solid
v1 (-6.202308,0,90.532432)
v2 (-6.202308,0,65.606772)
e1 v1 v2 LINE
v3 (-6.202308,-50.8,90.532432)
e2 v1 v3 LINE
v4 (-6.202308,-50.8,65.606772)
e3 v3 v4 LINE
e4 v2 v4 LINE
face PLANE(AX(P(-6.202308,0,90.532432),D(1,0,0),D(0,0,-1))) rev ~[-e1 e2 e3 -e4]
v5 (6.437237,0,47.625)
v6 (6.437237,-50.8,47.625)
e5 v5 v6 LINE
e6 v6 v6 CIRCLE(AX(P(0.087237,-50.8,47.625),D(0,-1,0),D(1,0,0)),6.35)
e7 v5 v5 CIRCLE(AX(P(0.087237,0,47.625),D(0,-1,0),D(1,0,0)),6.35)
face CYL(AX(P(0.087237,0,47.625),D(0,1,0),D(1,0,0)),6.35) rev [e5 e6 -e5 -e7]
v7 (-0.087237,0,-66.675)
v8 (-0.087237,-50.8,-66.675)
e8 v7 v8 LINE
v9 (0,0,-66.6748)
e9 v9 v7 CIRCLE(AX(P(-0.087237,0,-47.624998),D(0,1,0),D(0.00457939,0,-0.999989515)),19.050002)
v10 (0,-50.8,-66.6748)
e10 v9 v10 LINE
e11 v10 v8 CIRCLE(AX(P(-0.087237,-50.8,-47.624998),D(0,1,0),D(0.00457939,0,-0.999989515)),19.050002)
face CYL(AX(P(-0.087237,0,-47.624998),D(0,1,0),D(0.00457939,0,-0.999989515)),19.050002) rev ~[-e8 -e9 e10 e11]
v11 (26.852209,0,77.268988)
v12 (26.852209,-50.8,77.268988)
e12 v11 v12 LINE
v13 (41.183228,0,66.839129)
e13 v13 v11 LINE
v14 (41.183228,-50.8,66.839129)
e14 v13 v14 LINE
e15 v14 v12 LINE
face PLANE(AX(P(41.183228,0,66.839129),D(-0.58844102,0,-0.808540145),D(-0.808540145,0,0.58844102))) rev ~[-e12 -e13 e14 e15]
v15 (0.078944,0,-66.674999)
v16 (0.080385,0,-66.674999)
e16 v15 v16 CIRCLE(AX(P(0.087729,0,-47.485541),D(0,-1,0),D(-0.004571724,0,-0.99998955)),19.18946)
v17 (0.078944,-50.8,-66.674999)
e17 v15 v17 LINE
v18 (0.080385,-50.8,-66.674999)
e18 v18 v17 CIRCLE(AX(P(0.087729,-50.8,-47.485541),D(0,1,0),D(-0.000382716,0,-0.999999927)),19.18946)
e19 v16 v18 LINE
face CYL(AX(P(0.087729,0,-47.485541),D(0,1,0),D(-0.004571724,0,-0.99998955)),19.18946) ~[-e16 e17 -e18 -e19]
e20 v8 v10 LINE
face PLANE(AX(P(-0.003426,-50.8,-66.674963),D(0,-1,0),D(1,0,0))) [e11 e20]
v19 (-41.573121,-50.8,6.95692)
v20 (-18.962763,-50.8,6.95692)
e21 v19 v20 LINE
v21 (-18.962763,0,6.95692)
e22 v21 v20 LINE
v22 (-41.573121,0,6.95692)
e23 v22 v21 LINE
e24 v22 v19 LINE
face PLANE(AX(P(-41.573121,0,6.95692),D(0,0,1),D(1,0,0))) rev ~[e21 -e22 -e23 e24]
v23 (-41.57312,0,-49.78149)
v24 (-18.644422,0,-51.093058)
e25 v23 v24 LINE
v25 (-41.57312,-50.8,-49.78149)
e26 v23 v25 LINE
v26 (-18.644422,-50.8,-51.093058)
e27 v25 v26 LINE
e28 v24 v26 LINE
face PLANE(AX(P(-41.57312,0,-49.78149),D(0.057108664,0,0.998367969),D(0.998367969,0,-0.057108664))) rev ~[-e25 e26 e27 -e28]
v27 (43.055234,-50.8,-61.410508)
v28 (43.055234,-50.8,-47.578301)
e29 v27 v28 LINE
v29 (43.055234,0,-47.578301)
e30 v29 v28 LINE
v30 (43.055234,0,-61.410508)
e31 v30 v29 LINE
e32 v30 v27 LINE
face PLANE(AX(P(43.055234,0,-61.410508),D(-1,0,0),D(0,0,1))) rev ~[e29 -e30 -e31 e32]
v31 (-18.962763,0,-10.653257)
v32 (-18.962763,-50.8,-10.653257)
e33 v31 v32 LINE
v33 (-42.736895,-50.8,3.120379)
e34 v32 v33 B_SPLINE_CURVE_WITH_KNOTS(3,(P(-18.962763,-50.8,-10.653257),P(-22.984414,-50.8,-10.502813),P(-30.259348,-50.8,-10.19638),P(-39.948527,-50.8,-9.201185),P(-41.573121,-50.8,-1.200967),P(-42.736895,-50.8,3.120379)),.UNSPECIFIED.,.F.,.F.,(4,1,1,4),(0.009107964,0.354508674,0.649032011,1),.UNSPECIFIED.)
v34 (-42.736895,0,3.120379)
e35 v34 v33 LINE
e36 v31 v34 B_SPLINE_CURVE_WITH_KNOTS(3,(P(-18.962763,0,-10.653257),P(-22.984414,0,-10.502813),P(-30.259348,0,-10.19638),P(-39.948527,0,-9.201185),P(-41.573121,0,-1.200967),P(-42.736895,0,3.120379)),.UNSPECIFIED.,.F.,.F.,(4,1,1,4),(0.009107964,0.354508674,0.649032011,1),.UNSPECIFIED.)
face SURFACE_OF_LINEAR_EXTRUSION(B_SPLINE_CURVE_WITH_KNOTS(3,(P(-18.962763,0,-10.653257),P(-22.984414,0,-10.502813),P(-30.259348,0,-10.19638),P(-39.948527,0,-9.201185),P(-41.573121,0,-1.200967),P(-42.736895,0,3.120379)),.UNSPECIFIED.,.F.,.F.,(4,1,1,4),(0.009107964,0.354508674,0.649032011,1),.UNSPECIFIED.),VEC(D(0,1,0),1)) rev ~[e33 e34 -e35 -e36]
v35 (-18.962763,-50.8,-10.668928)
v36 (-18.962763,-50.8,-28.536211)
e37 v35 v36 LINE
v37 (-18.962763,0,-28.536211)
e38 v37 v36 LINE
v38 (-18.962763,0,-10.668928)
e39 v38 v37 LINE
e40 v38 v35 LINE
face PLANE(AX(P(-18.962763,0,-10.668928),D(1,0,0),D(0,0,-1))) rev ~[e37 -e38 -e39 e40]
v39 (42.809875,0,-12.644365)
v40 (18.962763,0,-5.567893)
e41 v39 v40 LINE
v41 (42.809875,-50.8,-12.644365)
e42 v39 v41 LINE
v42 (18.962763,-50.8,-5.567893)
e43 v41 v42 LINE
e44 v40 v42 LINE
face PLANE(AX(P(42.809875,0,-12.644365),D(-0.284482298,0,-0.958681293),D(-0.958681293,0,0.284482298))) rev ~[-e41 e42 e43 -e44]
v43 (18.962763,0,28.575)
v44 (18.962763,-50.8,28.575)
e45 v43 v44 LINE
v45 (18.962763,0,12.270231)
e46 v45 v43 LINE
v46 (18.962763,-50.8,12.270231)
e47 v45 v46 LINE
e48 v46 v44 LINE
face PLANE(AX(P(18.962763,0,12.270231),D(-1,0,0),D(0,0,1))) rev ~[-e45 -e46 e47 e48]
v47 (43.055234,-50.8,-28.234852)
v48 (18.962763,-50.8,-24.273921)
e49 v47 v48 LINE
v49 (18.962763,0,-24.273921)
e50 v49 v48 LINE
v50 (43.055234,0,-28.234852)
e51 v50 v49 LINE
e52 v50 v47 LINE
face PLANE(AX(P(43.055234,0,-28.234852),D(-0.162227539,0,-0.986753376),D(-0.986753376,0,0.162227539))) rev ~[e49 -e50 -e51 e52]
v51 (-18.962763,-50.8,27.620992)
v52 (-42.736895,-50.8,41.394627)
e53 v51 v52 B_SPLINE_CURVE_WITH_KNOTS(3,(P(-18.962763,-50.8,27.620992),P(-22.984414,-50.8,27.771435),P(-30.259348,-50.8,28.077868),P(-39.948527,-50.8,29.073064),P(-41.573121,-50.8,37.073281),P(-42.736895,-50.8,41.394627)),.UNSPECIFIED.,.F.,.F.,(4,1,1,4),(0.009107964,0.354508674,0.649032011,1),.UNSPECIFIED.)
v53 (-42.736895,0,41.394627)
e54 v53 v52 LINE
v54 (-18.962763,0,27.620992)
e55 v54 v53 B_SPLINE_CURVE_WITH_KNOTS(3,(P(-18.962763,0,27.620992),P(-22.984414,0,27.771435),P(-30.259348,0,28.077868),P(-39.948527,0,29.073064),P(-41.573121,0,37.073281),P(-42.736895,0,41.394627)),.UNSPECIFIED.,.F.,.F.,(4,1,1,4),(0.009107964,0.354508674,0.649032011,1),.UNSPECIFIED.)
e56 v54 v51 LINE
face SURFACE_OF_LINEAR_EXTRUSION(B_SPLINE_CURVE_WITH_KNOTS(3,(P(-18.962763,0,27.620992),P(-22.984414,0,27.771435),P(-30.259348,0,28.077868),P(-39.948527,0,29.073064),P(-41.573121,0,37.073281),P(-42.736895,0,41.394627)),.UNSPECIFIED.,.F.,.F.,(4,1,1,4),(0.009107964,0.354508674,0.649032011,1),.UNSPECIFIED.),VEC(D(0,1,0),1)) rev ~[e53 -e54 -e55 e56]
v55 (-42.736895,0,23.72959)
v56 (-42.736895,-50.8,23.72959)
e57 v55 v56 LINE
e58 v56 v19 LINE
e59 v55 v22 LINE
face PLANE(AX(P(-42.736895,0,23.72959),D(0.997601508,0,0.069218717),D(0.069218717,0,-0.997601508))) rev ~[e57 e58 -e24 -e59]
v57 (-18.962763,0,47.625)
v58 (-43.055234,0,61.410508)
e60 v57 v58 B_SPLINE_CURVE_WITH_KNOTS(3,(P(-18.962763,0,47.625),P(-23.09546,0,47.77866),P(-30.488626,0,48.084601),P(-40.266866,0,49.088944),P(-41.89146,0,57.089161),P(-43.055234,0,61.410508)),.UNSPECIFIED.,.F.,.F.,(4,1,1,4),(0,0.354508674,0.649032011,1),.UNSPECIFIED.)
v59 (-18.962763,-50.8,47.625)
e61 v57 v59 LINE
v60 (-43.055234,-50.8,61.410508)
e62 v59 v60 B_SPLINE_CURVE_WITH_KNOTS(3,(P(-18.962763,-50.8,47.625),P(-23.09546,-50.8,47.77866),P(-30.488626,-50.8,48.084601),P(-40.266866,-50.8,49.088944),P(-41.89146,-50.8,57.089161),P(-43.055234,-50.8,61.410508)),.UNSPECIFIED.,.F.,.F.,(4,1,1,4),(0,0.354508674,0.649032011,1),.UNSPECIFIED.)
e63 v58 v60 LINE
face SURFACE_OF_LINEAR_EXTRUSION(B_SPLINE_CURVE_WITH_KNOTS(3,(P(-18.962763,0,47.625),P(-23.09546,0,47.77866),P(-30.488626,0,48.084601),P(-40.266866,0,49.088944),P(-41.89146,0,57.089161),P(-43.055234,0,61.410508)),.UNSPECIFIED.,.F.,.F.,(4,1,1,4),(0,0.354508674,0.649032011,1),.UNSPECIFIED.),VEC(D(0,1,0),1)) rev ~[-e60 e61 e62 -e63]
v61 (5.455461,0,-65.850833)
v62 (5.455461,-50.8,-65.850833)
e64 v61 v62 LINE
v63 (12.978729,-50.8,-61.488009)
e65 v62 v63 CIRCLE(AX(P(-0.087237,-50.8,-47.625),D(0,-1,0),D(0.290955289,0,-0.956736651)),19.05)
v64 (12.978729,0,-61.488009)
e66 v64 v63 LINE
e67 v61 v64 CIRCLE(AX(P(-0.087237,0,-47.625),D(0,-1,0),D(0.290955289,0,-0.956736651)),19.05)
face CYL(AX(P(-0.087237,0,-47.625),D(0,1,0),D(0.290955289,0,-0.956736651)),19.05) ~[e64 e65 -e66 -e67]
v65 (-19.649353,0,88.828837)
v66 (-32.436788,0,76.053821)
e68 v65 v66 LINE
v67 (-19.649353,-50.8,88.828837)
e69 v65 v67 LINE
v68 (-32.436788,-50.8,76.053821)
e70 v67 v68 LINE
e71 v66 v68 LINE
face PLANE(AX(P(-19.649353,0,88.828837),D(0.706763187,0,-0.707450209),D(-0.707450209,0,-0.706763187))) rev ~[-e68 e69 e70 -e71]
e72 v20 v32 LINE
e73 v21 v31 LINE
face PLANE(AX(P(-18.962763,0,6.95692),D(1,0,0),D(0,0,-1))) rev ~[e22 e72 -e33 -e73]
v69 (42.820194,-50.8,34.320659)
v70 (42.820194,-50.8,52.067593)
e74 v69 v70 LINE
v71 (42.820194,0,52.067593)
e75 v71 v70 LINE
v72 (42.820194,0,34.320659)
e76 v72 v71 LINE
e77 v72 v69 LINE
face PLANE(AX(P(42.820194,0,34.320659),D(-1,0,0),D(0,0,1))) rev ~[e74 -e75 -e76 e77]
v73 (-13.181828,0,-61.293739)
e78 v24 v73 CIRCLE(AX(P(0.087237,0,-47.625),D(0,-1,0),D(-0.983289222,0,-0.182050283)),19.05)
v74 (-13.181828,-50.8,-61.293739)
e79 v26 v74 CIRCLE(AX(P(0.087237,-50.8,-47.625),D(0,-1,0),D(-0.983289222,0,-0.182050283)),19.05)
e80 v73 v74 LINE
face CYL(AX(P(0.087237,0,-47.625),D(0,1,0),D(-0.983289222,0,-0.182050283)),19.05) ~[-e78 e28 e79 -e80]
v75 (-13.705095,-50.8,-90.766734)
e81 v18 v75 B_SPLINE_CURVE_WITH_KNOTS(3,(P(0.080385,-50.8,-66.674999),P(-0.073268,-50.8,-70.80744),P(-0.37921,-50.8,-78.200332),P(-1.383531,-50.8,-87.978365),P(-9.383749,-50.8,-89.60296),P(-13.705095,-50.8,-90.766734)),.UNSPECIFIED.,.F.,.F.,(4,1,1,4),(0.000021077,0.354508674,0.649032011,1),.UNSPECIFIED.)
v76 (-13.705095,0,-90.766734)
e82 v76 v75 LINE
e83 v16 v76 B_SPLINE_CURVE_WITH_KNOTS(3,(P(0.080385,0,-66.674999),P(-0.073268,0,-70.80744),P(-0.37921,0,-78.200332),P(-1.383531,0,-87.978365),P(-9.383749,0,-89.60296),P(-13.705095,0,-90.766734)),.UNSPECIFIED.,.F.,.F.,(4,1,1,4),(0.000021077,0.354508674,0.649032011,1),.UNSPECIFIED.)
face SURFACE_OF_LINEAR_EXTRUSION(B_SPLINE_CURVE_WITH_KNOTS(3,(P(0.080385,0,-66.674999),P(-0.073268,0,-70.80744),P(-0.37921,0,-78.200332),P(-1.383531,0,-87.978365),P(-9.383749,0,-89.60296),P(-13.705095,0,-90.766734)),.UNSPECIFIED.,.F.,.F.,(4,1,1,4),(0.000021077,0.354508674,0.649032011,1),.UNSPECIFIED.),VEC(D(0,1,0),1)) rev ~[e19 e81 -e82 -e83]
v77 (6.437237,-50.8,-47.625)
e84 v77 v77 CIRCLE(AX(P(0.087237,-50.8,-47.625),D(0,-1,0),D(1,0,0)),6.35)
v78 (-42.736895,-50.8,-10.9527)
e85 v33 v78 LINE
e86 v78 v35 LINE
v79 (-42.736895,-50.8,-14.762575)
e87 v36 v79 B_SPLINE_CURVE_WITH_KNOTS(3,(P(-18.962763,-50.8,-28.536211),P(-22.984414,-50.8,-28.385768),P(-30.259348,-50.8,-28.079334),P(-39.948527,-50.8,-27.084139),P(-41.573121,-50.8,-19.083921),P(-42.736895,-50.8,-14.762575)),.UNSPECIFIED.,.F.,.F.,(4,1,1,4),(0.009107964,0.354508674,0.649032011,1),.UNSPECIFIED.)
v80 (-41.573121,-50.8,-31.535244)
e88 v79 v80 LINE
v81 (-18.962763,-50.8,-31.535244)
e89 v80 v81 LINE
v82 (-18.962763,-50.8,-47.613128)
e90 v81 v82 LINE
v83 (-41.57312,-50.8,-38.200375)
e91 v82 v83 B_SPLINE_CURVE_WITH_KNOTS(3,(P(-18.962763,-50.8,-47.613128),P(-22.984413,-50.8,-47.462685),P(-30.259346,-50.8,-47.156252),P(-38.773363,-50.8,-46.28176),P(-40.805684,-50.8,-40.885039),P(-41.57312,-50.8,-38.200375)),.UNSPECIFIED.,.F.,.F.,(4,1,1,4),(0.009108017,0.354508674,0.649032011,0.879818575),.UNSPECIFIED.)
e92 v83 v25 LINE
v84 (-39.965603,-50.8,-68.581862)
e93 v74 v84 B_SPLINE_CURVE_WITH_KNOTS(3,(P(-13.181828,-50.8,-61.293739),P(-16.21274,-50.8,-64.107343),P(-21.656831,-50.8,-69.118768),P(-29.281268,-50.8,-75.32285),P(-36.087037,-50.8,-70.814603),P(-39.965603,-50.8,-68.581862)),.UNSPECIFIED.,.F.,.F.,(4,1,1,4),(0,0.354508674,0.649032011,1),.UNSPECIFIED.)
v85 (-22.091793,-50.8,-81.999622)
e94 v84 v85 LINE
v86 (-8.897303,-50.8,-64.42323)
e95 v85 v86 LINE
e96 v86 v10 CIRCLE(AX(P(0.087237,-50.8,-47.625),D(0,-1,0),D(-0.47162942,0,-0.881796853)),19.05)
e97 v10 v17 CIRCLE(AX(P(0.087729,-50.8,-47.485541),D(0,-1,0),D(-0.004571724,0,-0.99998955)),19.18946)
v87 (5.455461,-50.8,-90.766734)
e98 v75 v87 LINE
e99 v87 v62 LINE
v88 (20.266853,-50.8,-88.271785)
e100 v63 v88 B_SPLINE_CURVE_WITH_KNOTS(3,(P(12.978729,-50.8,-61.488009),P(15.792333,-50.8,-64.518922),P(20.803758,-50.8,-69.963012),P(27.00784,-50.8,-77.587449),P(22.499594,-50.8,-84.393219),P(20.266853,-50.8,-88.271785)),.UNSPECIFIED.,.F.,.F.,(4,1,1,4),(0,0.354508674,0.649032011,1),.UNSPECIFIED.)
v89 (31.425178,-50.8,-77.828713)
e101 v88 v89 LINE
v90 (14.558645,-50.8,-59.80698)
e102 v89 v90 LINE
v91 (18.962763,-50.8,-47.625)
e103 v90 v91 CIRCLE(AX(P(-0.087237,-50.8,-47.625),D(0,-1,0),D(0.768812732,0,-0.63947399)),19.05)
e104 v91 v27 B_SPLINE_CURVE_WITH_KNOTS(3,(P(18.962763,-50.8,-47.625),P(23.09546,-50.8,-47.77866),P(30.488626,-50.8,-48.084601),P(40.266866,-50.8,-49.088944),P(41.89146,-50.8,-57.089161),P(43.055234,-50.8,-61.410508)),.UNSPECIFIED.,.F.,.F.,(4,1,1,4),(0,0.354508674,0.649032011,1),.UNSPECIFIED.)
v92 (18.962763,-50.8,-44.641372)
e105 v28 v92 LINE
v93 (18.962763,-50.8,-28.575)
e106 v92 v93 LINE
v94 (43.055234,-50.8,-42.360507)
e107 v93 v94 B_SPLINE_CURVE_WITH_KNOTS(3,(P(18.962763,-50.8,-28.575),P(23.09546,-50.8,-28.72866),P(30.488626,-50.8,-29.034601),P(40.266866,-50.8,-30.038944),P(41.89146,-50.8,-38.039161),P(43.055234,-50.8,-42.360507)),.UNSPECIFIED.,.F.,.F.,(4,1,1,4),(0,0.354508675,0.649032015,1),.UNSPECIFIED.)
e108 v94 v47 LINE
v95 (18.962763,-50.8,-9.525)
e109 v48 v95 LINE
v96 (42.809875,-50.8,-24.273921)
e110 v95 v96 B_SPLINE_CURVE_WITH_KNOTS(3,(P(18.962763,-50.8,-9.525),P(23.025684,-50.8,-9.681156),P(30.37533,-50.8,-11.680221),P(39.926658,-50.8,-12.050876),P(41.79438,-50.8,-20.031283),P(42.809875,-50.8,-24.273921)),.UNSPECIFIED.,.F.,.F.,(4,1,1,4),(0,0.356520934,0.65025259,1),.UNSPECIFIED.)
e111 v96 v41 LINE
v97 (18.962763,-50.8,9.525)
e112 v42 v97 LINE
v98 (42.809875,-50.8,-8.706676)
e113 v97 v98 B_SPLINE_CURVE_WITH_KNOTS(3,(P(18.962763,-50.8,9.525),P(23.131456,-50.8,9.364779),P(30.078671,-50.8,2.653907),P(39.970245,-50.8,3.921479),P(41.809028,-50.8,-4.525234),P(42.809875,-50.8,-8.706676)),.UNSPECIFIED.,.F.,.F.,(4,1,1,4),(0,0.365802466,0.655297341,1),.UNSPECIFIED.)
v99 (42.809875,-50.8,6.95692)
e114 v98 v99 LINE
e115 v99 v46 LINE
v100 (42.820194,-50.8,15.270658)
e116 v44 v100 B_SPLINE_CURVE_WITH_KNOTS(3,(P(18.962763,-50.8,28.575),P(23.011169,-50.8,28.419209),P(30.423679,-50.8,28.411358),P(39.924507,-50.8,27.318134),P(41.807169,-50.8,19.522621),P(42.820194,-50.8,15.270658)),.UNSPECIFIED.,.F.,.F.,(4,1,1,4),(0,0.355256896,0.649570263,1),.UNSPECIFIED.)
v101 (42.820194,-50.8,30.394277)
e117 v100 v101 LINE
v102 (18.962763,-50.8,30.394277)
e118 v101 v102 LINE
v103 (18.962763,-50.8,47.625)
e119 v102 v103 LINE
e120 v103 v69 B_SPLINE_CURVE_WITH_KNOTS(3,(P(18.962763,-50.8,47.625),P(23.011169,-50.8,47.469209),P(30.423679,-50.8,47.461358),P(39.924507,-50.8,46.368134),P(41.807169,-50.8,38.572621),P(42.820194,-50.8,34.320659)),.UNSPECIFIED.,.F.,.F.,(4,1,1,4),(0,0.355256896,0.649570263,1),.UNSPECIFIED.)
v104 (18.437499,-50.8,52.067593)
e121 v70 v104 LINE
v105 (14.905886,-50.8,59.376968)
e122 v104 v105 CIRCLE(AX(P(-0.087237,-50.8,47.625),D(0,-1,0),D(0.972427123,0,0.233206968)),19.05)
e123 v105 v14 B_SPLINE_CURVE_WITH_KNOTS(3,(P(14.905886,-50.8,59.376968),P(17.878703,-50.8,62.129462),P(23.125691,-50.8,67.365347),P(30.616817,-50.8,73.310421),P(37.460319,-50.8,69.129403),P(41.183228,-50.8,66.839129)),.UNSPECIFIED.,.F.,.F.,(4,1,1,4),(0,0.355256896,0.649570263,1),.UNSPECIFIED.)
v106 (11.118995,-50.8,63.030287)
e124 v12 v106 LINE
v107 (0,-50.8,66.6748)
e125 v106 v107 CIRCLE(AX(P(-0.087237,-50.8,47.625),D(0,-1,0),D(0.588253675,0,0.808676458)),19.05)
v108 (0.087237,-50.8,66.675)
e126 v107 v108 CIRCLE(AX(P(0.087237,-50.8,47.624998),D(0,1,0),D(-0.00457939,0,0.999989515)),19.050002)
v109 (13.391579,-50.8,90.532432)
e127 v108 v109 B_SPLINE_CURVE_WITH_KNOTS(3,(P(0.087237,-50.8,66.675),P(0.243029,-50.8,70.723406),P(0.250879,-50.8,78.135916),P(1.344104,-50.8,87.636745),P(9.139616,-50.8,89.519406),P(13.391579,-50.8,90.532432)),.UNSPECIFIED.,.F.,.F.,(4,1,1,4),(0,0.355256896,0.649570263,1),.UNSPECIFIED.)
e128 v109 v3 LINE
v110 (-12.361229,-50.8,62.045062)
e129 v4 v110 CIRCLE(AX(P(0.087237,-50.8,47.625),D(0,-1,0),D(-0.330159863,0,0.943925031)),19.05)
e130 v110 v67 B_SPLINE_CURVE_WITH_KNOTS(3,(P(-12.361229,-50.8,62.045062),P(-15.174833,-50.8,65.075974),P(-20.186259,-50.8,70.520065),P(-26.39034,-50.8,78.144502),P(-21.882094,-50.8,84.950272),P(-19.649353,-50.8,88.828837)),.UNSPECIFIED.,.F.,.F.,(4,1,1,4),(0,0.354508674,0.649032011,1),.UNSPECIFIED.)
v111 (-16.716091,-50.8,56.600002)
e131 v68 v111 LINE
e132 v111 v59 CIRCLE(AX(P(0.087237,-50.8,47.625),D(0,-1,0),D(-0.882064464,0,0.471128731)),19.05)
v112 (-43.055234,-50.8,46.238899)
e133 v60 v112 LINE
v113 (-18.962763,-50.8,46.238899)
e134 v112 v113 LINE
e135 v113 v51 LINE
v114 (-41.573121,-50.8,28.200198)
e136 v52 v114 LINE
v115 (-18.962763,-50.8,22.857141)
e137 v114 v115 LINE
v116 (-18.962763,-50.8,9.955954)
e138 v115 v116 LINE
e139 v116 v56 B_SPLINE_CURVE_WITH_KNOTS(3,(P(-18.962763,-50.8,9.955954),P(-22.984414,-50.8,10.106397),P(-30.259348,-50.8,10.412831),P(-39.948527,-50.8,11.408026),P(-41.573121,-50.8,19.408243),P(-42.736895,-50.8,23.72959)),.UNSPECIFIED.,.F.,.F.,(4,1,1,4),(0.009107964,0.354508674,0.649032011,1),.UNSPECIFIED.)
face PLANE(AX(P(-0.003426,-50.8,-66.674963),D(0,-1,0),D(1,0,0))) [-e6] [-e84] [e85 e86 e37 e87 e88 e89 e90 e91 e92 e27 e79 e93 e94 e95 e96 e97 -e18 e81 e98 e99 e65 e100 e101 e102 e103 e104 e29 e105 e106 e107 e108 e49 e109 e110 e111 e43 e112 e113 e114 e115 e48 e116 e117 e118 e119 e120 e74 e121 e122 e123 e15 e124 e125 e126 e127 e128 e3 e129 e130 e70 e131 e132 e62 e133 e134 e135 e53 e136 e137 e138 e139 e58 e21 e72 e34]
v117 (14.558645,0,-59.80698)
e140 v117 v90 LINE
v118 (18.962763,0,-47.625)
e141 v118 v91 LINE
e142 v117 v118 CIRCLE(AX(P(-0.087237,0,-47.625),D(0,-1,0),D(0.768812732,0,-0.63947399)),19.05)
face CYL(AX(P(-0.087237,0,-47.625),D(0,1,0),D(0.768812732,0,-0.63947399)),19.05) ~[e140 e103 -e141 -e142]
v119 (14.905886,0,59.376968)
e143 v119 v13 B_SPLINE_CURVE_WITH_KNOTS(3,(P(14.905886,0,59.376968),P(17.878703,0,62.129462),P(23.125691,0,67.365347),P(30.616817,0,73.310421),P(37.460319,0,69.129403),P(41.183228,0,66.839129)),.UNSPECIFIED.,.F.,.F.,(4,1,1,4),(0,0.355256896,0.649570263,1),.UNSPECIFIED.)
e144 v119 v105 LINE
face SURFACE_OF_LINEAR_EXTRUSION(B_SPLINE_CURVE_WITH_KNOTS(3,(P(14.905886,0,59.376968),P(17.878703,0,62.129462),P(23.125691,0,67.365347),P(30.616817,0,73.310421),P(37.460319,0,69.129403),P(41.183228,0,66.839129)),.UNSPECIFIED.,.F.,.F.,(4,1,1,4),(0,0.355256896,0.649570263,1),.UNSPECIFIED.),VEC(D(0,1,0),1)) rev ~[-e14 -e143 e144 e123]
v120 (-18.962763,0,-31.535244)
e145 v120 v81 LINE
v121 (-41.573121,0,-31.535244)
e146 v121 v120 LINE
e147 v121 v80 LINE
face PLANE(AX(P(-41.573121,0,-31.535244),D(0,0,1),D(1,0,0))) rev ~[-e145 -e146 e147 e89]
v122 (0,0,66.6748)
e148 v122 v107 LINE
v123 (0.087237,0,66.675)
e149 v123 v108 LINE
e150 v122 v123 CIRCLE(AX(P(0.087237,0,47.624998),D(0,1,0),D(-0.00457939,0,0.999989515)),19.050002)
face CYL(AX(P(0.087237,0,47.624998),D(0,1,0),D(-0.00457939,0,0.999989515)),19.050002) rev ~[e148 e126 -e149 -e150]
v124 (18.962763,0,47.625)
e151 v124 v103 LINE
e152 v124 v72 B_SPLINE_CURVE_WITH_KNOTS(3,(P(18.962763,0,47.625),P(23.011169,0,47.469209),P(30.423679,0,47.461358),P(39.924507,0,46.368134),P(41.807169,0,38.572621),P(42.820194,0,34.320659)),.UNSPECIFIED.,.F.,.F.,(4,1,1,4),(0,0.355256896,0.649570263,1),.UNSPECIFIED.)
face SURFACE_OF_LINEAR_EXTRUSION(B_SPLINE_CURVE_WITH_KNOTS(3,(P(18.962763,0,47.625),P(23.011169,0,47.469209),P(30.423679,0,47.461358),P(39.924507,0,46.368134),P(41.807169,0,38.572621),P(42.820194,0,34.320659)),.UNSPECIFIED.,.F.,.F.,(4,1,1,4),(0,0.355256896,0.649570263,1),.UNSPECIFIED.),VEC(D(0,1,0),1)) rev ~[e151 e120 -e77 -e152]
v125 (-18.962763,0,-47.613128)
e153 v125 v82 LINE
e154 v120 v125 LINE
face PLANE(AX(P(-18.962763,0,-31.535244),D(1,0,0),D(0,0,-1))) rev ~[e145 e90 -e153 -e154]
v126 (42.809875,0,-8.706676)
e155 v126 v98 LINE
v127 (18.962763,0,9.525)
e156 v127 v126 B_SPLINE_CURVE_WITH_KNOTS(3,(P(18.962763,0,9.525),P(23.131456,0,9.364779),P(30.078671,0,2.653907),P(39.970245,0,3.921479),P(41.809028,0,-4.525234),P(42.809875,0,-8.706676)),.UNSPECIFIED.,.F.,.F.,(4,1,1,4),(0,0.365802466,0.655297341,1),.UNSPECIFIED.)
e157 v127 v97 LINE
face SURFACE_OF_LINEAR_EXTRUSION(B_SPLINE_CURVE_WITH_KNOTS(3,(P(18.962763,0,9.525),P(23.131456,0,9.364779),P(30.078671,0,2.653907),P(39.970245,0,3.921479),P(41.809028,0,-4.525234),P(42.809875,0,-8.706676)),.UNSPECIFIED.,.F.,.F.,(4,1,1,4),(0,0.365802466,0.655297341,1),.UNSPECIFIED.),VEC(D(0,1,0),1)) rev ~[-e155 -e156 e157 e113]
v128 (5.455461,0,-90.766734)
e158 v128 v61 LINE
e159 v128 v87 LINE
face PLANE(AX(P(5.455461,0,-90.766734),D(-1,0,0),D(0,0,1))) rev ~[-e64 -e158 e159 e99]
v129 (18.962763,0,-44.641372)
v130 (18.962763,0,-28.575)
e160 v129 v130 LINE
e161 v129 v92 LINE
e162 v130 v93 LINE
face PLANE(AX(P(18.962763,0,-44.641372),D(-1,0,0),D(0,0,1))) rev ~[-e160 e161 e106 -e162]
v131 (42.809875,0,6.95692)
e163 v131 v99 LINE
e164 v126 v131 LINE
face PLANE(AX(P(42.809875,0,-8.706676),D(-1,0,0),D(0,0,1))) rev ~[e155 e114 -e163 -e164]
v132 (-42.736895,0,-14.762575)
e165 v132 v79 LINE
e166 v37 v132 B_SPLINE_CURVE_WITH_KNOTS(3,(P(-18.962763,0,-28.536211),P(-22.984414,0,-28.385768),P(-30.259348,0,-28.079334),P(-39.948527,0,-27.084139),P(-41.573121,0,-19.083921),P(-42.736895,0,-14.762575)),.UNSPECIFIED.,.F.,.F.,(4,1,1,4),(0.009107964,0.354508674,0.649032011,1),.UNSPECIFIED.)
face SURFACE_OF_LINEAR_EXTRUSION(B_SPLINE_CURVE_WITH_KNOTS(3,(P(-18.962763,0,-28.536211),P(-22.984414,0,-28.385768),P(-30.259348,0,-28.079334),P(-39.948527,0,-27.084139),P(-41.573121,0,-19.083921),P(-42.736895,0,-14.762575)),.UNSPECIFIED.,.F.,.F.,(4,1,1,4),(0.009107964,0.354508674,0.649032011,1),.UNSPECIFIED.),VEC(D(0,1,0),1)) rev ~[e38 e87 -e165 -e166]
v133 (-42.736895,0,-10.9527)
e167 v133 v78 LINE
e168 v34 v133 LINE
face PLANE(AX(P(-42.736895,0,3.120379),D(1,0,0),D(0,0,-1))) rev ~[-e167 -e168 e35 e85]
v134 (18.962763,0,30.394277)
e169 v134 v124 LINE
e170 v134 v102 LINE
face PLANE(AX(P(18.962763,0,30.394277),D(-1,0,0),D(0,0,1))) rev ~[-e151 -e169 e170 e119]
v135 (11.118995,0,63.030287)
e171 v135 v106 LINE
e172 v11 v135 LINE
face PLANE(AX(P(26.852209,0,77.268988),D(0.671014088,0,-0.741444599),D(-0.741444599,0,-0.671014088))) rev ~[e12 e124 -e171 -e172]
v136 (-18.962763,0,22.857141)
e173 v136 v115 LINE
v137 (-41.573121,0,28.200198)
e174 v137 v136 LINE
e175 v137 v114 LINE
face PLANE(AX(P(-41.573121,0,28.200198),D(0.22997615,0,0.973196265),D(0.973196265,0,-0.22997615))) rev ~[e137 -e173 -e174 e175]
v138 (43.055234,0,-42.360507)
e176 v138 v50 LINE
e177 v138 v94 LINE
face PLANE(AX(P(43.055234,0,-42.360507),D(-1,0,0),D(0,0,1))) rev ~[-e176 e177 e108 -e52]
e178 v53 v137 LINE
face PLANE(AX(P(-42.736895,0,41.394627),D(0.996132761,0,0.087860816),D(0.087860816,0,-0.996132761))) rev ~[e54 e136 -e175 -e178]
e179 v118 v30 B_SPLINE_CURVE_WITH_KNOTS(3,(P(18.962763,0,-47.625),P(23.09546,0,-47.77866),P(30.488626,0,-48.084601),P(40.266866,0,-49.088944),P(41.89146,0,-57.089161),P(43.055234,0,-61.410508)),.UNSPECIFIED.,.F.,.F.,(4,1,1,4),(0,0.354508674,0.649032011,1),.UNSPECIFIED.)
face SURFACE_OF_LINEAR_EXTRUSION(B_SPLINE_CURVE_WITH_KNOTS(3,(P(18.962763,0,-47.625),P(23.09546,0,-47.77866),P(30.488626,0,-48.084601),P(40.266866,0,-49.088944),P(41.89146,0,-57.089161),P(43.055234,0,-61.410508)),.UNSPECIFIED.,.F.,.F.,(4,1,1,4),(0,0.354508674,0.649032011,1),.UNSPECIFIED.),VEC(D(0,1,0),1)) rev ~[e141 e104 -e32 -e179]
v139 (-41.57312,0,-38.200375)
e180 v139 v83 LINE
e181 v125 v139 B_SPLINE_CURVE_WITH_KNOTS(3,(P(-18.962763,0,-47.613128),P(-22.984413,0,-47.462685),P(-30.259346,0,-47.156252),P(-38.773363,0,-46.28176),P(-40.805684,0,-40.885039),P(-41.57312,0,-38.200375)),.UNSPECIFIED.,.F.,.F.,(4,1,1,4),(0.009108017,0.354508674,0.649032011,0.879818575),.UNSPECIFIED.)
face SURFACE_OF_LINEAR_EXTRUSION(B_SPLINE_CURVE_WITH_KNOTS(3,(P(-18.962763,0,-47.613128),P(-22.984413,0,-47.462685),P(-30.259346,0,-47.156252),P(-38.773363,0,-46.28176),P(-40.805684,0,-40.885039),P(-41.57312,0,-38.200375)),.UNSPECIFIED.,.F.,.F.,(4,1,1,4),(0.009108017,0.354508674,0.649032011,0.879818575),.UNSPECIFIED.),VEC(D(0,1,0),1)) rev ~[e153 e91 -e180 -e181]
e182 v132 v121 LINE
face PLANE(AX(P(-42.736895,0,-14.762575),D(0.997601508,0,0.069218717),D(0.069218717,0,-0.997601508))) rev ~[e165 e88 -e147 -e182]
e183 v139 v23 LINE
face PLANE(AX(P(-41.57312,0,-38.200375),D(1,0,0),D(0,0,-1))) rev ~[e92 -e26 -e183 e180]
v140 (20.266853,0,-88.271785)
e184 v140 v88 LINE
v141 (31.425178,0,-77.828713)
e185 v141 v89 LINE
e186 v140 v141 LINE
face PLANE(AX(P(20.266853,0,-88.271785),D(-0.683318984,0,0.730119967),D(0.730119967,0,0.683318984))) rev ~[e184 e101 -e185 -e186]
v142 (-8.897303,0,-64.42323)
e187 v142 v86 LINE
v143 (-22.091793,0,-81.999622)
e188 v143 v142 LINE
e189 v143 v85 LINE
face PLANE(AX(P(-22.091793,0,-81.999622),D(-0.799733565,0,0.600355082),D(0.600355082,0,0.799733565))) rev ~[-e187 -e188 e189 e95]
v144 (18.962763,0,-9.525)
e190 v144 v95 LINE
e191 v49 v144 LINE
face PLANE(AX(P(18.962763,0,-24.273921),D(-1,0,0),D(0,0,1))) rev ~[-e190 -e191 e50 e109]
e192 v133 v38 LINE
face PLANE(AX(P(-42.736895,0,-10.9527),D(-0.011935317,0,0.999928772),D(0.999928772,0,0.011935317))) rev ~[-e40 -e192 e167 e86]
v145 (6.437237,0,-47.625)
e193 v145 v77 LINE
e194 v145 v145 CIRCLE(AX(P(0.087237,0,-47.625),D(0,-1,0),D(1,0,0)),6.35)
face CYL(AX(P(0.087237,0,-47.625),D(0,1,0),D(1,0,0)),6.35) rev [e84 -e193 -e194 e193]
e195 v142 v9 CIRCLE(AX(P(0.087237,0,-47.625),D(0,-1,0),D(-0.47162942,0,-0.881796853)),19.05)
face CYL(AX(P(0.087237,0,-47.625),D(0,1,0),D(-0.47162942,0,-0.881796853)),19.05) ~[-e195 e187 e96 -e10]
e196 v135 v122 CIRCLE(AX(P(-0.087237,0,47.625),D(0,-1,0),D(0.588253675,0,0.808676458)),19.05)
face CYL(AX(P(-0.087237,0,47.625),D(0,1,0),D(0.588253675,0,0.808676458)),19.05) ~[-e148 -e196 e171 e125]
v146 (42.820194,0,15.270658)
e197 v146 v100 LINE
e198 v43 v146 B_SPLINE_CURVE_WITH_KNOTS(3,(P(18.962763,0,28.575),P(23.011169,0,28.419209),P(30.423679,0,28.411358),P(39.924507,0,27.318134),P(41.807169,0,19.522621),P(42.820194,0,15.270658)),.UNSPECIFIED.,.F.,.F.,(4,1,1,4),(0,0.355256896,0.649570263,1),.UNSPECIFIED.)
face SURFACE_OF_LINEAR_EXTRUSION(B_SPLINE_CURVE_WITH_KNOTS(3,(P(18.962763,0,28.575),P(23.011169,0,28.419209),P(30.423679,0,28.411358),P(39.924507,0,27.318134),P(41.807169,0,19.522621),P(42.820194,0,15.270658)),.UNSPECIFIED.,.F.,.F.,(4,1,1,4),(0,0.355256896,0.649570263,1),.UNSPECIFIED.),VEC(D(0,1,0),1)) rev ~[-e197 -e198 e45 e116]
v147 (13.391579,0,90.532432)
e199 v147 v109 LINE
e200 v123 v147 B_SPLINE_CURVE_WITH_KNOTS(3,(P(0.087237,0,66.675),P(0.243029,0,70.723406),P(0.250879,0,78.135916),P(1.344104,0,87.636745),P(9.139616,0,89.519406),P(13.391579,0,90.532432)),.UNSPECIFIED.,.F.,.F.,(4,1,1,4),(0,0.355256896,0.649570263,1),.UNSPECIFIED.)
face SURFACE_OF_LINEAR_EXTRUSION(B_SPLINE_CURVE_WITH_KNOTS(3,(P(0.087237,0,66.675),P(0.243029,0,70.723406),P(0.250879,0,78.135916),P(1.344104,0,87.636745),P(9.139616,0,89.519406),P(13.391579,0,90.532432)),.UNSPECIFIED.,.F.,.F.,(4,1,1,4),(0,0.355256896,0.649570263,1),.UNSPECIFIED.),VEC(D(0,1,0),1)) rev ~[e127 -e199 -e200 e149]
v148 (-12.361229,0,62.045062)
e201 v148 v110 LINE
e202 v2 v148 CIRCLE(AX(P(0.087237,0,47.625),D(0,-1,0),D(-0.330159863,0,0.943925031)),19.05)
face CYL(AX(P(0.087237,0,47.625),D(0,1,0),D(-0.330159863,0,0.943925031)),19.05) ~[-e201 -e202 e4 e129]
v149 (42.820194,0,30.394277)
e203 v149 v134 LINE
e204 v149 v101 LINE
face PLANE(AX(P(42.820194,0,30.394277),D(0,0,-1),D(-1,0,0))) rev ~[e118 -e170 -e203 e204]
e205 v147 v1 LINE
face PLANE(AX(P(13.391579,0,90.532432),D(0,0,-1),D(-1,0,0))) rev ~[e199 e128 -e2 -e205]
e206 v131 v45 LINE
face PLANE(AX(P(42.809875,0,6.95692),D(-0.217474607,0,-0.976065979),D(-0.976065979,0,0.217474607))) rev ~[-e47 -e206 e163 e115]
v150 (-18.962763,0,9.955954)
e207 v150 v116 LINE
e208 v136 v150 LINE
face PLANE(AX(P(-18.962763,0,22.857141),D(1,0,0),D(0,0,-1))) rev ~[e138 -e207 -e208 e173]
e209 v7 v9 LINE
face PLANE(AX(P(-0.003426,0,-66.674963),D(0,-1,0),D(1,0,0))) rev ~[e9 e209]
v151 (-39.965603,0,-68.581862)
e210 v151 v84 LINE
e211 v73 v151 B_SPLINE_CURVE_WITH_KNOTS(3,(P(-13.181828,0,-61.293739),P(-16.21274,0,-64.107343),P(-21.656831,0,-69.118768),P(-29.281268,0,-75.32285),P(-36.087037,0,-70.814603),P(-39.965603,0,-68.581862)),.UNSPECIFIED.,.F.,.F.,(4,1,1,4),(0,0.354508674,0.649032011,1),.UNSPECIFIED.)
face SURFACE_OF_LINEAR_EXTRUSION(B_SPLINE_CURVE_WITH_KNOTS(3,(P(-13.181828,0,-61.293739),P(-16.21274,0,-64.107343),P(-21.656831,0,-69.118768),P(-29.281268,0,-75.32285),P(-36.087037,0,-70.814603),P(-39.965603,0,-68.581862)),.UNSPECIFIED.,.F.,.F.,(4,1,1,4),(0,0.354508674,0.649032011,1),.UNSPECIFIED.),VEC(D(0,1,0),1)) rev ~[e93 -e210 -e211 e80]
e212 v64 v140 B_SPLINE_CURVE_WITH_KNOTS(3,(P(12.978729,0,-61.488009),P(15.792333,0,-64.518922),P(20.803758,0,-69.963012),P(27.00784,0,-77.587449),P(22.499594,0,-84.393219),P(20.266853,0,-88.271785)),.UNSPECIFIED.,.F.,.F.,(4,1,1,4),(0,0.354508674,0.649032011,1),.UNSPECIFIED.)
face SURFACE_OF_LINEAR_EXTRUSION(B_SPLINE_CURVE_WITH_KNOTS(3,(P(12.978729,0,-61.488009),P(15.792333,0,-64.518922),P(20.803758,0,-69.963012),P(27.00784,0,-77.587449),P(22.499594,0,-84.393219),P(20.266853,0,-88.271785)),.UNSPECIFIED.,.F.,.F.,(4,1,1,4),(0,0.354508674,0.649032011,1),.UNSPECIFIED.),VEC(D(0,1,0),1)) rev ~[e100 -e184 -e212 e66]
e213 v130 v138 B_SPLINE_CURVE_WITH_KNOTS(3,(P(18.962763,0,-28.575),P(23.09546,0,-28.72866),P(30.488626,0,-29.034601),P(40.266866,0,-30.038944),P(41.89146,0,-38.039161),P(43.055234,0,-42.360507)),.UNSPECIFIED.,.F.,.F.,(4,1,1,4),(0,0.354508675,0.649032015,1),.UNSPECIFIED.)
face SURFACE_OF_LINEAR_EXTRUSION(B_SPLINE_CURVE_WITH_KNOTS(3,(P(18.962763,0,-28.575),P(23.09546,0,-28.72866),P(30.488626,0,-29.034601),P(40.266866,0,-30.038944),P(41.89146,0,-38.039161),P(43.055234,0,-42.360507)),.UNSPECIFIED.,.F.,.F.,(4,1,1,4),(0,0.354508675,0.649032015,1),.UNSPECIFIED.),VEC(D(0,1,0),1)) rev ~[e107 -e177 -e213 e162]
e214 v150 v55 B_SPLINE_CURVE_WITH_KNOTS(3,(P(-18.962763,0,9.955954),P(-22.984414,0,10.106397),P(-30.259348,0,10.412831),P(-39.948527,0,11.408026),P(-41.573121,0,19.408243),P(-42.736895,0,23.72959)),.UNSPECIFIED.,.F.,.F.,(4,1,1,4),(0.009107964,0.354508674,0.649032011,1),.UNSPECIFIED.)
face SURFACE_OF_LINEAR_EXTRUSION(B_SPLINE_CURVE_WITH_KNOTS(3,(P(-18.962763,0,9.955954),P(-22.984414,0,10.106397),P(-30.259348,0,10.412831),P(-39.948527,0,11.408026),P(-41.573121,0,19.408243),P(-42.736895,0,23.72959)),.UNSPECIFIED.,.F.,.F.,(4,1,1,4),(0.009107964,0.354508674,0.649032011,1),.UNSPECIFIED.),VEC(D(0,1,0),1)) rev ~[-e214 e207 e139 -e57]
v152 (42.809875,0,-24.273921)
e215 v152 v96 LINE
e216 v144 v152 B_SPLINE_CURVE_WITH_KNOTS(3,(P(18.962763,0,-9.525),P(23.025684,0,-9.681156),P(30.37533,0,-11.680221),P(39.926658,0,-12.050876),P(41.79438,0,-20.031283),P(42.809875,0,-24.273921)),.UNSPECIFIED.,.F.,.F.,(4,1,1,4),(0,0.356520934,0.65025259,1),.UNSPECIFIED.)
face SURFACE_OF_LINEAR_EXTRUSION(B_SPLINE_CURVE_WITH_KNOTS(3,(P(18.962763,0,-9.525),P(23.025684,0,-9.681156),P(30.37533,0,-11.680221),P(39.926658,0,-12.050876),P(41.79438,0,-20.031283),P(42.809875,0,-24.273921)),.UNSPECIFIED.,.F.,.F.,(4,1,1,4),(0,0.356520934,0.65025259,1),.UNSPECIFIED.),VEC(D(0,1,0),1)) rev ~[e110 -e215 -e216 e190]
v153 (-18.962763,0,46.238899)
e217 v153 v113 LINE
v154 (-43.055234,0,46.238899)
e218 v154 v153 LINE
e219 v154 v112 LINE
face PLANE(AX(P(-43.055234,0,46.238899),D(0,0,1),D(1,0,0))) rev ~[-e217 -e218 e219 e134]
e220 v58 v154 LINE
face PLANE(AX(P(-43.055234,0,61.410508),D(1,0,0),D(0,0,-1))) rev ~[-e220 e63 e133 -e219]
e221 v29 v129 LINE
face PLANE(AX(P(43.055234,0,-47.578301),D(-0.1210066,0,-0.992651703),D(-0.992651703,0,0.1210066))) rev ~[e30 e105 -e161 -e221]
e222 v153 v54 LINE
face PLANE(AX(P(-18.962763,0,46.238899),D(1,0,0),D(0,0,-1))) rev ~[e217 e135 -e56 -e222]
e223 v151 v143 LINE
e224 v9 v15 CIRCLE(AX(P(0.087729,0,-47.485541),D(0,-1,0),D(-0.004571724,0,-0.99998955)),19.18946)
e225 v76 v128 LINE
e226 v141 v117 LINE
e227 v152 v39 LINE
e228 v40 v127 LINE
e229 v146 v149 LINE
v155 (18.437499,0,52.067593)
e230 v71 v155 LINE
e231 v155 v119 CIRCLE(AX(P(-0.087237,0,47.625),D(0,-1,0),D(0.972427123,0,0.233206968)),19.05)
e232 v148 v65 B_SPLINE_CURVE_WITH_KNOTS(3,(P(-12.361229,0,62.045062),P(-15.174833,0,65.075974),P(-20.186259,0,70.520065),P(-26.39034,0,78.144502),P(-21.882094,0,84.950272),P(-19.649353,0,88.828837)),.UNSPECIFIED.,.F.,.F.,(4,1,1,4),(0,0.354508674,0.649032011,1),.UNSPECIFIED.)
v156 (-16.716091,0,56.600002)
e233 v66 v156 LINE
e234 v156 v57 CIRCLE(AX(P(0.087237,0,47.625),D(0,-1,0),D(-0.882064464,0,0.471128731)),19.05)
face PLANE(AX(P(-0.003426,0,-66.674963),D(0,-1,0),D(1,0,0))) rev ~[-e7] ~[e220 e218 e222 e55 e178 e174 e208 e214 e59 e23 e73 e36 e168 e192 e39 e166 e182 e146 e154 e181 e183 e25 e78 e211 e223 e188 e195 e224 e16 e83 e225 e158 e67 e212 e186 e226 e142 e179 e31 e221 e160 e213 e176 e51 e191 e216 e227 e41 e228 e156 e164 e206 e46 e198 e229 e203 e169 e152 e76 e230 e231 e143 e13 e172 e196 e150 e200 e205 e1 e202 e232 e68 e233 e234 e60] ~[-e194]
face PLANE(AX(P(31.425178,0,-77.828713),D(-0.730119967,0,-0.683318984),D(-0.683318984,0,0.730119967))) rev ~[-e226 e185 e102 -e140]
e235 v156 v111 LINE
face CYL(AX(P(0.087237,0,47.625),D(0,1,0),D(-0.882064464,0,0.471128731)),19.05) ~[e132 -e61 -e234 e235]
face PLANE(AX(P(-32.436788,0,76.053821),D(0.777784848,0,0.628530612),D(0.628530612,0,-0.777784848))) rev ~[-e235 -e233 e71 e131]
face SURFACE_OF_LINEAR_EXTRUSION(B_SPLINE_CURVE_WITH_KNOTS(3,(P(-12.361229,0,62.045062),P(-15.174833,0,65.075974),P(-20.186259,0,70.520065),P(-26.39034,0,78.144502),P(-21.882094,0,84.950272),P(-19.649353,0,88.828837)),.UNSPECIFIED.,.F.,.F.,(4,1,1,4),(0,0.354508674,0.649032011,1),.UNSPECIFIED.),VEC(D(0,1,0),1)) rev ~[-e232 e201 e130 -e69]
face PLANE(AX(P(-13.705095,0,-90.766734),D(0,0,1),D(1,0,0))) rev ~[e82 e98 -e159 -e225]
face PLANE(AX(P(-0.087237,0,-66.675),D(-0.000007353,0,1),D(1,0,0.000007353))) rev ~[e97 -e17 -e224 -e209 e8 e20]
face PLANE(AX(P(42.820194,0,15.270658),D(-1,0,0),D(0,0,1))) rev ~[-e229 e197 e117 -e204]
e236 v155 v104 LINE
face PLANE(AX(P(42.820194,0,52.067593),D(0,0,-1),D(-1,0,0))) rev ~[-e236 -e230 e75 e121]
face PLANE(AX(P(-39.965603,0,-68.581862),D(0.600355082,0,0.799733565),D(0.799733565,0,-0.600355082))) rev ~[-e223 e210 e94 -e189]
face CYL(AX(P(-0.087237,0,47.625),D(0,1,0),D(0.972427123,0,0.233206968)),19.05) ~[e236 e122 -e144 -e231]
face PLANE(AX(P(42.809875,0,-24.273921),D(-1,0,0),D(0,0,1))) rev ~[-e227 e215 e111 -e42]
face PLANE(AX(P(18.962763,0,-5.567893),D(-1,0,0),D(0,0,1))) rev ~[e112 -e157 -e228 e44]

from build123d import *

# Parameters (mm, degrees)
F0_R     = 6.35
F1_DEPTH = 50.8


# Not quite as in the source:
# - ends of sketch curves that miss each other by under 0.0002 mm in the source are joined


with BuildPart() as f1:
    # F0 (on Front) → F1 (new body)
    with BuildSketch(Plane.XZ):
        with BuildLine():
            ThreePointArc((0, 66.6748002519), (-0.0436185803, 66.6749500629), (-0.0872373893, 66.675))
            Line((-0.0872373893, 66.675), (0.0872373893, 66.675))
            add(Edge.make_bspline(
                [(0.0872373857, 66.675), (0.2430286091, 70.7234059267), (0.2508794322, 78.1359164956), (1.3441036555, 87.6367445855), (9.1396162432, 89.5194059267), (13.3915788725, 90.5324317255)],
                knots=[0, 0, 0, 0, 0.3552568963, 0.6495702629, 1, 1, 1, 1], degree=3))
            Line((13.3915788725, 90.5324317255), (-6.2023079954, 90.5324317255))
            Line((-6.2023079954, 90.5324317255), (-6.2023079954, 65.6067718497))
            ThreePointArc((-6.2023079954, 65.6067718497), (-3.1455649251, 66.398691411), (0, 66.6748002519))
        make_face()
        with BuildLine():
            Line((0.0872373893, 66.675), (-0.0872373893, 66.675))
            ThreePointArc((-0.0872373893, 66.675), (-0.0436185803, 66.6749500629), (0, 66.6748002519))
            ThreePointArc((0, 66.6748002519), (0.0436185803, 66.6749500629), (0.0872373893, 66.675))
        make_face()
        with BuildLine():
            ThreePointArc((11.1189951284, 63.0302865199), (5.8462468924, 65.7273828343), (0, 66.6748002519))
            ThreePointArc((0, 66.6748002519), (-3.1455649251, 66.398691411), (-6.2023079954, 65.6067718497))
            ThreePointArc((-6.2023079954, 65.6067718497), (-9.4495187485, 64.1159909456), (-12.3612291686, 62.0450617321))
            ThreePointArc((-12.3612291686, 62.0450617321), (-14.7898940453, 59.5234646185), (-16.7160906478, 56.600002333))
            ThreePointArc((-16.7160906478, 56.600002333), (-18.3925610283, 52.2509648125), (-18.9627626107, 47.625))
            Line((-18.9627626107, 47.625), (-18.9627626107, 46.238899231))
            Line((-18.9627626107, 46.238899231), (-18.9627626107, 27.6209915512))
            Line((-18.9627626107, 27.6209915512), (-18.9627626107, 22.8571407497))
            Line((-18.9627626107, 22.8571407497), (-18.9627626107, 9.9559536659))
            Line((-18.9627626107, 9.9559536659), (-18.9627626107, 6.9569204934))
            Line((-18.9627626107, 6.9569204934), (-18.9627626107, -10.6532565794))
            add(Edge.make_bspline(
                [(-18.6444241287, -10.6651281533), (-18.7506005412, -10.661180346), (-18.8567145999, -10.657223662), (-18.9627626107, -10.6532565794)],
                knots=[0, 0, 0, 0, 0.0091079643, 0.0091079643, 0.0091079643, 0.0091079643], degree=3))
            Line((-18.6444241287, -10.6651281533), (-18.9627626107, -10.6689278948))
            Line((-18.9627626107, -10.6689278948), (-18.9627626107, -28.536211024))
            Line((-18.9627626107, -28.536211024), (-18.9627626107, -31.5352441965))
            Line((-18.9627626107, -31.5352441965), (-18.9627626107, -47.6131283575))
            Line((-18.9627626107, -47.6131283575), (-18.9627626107, -47.625))
            ThreePointArc((-18.9627626107, -47.625), (-18.883010592, -49.366318905), (-18.6444222927, -51.0930578942))
            ThreePointArc((-18.6444222927, -51.0930578942), (-16.706364569, -56.6181881592), (-13.1818276234, -61.2937385552))
            ThreePointArc((-13.1818276234, -61.2937385552), (-11.1490506185, -63.0083784263), (-8.8973030522, -64.4232300572))
            ThreePointArc((-8.8973030522, -64.4232300572), (-4.5862709651, -66.0928320239), (0, -66.6748002519))
            ThreePointArc((0, -66.6748002519), (0.0402063893, -66.6745736982), (0.0804122108, -66.6742622852))
            ThreePointArc((0.0804122108, -66.6742622852), (2.7974683178, -66.4553205757), (5.4554608651, -65.8508332062))
            ThreePointArc((5.4554608651, -65.8508332062), (9.4693916223, -64.1044824535), (12.9787289686, -61.4880091659))
            ThreePointArc((12.9787289686, -61.4880091659), (13.7941569026, -60.6714321756), (14.5586451488, -59.8069795058))
            ThreePointArc((14.5586451488, -59.8069795058), (17.8279316352, -54.1018216607), (18.9627626107, -47.625))
            Line((18.9627626107, -47.625), (18.9627626107, -44.6413718164))
            Line((18.9627626107, -44.6413718164), (18.9627626107, -28.575))
            Line((18.9627626107, -28.575), (18.9627626107, -24.2739211984))
            Line((18.9627626107, -24.2739211984), (18.9627626107, -9.525))
            Line((18.9627626107, -9.525), (18.9627626107, -5.5678933859))
            Line((18.9627626107, -5.5678933859), (18.9627626107, 9.525))
            Line((18.9627626107, 9.525), (18.9627626107, 12.2702307999))
            Line((18.9627626107, 12.2702307999), (18.9627626107, 28.575))
            Line((18.9627626107, 28.575), (18.9627626107, 30.3942766041))
            Line((18.9627626107, 30.3942766041), (18.9627626107, 47.625))
            ThreePointArc((18.9627626107, 47.625), (18.830991044, 49.8617684162), (18.4374993091, 52.0675927401))
            ThreePointArc((18.4374993091, 52.0675927401), (17.0655606958, 55.9125821474), (14.9058863631, 59.376967501))
            ThreePointArc((14.9058863631, 59.376967501), (13.1391851128, 61.33500539), (11.1189951284, 63.0302865199))
        make_face()
        with Locations((0.0872373893, -47.625)):
            Circle(F0_R, mode=Mode.SUBTRACT)
        with Locations((0.0872373893, 47.625)):
            Circle(F0_R, mode=Mode.SUBTRACT)
        with BuildLine():
            Line((26.852209121, 77.2689878941), (11.1189951284, 63.0302865199))
            ThreePointArc((11.1189951284, 63.0302865199), (13.1391851128, 61.33500539), (14.9058863631, 59.376967501))
            add(Edge.make_bspline(
                [(14.9058863631, 59.376967501), (17.8787026773, 62.1294617543), (23.1256905365, 67.365346873), (30.6168167674, 73.3104205806), (37.460319182, 69.129403368), (41.1832282024, 66.8391291713)],
                knots=[0, 0, 0, 0, 0.3552568963, 0.6495702629, 1, 1, 1, 1], degree=3))
            Line((41.1832282024, 66.8391291713), (26.852209121, 77.2689878941))
        make_face()
        with BuildLine():
            ThreePointArc((-16.7160906478, 56.600002333), (-14.7898940453, 59.5234646185), (-12.3612291686, 62.0450617321))
            add(Edge.make_bspline(
                [(-12.3612291686, 62.0450617321), (-15.1748332393, 65.0759741908), (-20.1862585725, 70.5200649728), (-26.3903403692, 78.1445018545), (-21.8820939834, 84.9502715651), (-19.6493531041, 88.8288373426)],
                knots=[0, 0, 0, 0, 0.354508674, 0.649032011, 1, 1, 1, 1], degree=3))
            Line((-19.6493531041, 88.8288373426), (-32.4367880821, 76.0538205504))
            Line((-32.4367880821, 76.0538205504), (-16.7160906478, 56.600002333))
        make_face()
        with BuildLine():
            Line((42.8201943362, 52.0675927401), (18.4374993091, 52.0675927401))
            ThreePointArc((18.4374993091, 52.0675927401), (18.830991044, 49.8617684162), (18.9627626107, 47.625))
            add(Edge.make_bspline(
                [(18.9627626107, 47.625), (23.0111685374, 47.4692087767), (30.4236791063, 47.4613579536), (39.9245071963, 46.3681337303), (41.8071685374, 38.5726211425), (42.8201943362, 34.3206585132)],
                knots=[0, 0, 0, 0, 0.3552568963, 0.6495702629, 1, 1, 1, 1], degree=3))
            Line((42.8201943362, 34.3206585132), (42.8201943362, 52.0675927401))
        make_face()
        with BuildLine():
            Line((-18.9627626107, 46.238899231), (-18.9627626107, 47.625))
            add(Edge.make_bspline(
                [(-18.9627626107, 47.625), (-23.0954598814, 47.7786602348), (-30.4886262273, 48.0846009077), (-40.2668655585, 49.0889436199), (-41.8914598814, 57.0891611241), (-43.0552338276, 61.4105075031)],
                knots=[0, 0, 0, 0, 0.354508674, 0.649032011, 1, 1, 1, 1], degree=3))
            Line((-43.0552338276, 61.4105075031), (-43.0552338276, 46.238899231))
            Line((-43.0552338276, 46.238899231), (-18.9627626107, 46.238899231))
        make_face()
        with BuildLine():
            Line((42.8201943411, 30.3942766041), (18.9627626107, 30.3942766041))
            Line((18.9627626107, 30.3942766041), (18.9627626107, 28.575))
            add(Edge.make_bspline(
                [(18.9627626107, 28.575), (23.0111685371, 28.4192087694), (30.4236791135, 28.4113579415), (39.9245072271, 27.3181337496), (41.8071685371, 19.5226211283), (42.8201943411, 15.2706584996)],
                knots=[0, 0, 0, 0, 0.3552568963, 0.6495702629, 1, 1, 1, 1], degree=3))
            Line((42.8201943411, 15.2706584996), (42.8201943411, 30.3942766041))
        make_face()
        with BuildLine():
            Line((-18.9627626107, 22.8571407497), (-18.9627626107, 27.6209915512))
            add(Edge.make_bspline(
                [(-18.9627626107, 27.6209915512), (-22.9844140999, 27.7714349554), (-30.2593476001, 28.0778684026), (-39.9485270765, 29.0730635972), (-41.5731213994, 37.0732811015), (-42.7368953456, 41.3946274804)],
                knots=[0.0091079643, 0.0091079643, 0.0091079643, 0.0091079643, 0.354508674, 0.649032011, 1, 1, 1, 1], degree=3))
            Line((-42.7368953456, 41.3946274804), (-41.5731213994, 28.2001979076))
            Line((-41.5731213994, 28.2001979076), (-18.9627626107, 22.8571407497))
        make_face()
        with BuildLine():
            Line((42.8098751268, 6.9569204934), (18.9627626107, 12.2702307999))
            Line((18.9627626107, 12.2702307999), (18.9627626107, 9.525))
            add(Edge.make_bspline(
                [(18.9627626107, 9.525), (23.1314562939, 9.364778535), (30.0786708201, 2.6539069602), (39.9702454496, 3.9214789741), (41.8090278021, -4.5252336061), (42.8098751268, -8.7066759335)],
                knots=[0, 0, 0, 0, 0.3658024663, 0.6552973413, 1, 1, 1, 1], degree=3))
            Line((42.8098751268, -8.7066759335), (42.8098751268, 6.9569204934))
        make_face()
        with BuildLine():
            Line((-18.9627626107, 6.9569204934), (-18.9627626107, 9.9559536659))
            add(Edge.make_bspline(
                [(-18.9627626107, 9.9559536659), (-22.9844140999, 10.10639707), (-30.2593476001, 10.4128305173), (-39.9485270765, 11.4080257119), (-41.5731213994, 19.4082432162), (-42.7368953456, 23.7295895951)],
                knots=[0.0091079643, 0.0091079643, 0.0091079643, 0.0091079643, 0.354508674, 0.649032011, 1, 1, 1, 1], degree=3))
            Line((-42.7368953456, 23.7295895951), (-41.5731213994, 6.9569204934))
            Line((-41.5731213994, 6.9569204934), (-18.9627626107, 6.9569204934))
        make_face()
        with BuildLine():
            Line((42.8098751268, -12.6443654299), (18.9627626107, -5.5678933859))
            Line((18.9627626107, -5.5678933859), (18.9627626107, -9.525))
            add(Edge.make_bspline(
                [(18.9627626107, -9.525), (23.0256837277, -9.6811561541), (30.3753295074, -11.6802210009), (39.9266576959, -12.0508755513), (41.7943803202, -20.0312831228), (42.8098751268, -24.2739211984)],
                knots=[0, 0, 0, 0, 0.3565209338, 0.6502525899, 1, 1, 1, 1], degree=3))
            Line((42.8098751268, -24.2739211984), (42.8098751268, -12.6443654299))
        make_face()
        with BuildLine():
            add(Edge.make_bspline(
                [(-18.6444241287, -10.6651281533), (-18.7506005412, -10.661180346), (-18.8567145999, -10.657223662), (-18.9627626107, -10.6532565794)],
                knots=[0, 0, 0, 0, 0.0091079643, 0.0091079643, 0.0091079643, 0.0091079643], degree=3))
            Line((-18.9627626107, -10.6532565794), (-18.9627626107, -10.6689278948))
            Line((-18.9627626107, -10.6689278948), (-18.6444241287, -10.6651281533))
        make_face()
        with BuildLine():
            Line((-18.9627626107, -10.6689278948), (-18.9627626107, -10.6532565794))
            add(Edge.make_bspline(
                [(-18.9627626107, -10.6532565794), (-22.9844140999, -10.5028131753), (-30.2593476001, -10.1963797281), (-39.9485270765, -9.2011845334), (-41.5731213994, -1.2009670292), (-42.7368953456, 3.1203793498)],
                knots=[0.0091079643, 0.0091079643, 0.0091079643, 0.0091079643, 0.354508674, 0.649032011, 1, 1, 1, 1], degree=3))
            Line((-42.7368953456, 3.1203793498), (-42.7368953456, -10.9526999295))
            Line((-42.7368953456, -10.9526999295), (-18.9627626107, -10.6689278948))
        make_face()
        with BuildLine():
            Line((43.0552338738, -28.2348524779), (18.9627626107, -24.2739211984))
            Line((18.9627626107, -24.2739211984), (18.9627626107, -28.575))
            add(Edge.make_bspline(
                [(18.9627626107, -28.575), (23.0954598996, -28.7286602208), (30.4886262184, -29.0346008867), (40.2668655483, -30.0389436981), (41.8914598996, -38.0391608321), (43.0552338738, -42.3605071535)],
                knots=[0, 0, 0, 0, 0.3545086755, 0.6490320146, 1, 1, 1, 1], degree=3))
            Line((43.0552338738, -42.3605071535), (43.0552338738, -28.2348524779))
        make_face()
        with BuildLine():
            Line((-18.9627626107, -31.5352441965), (-18.9627626107, -28.536211024))
            add(Edge.make_bspline(
                [(-18.9627626107, -28.536211024), (-22.9844140999, -28.3857676199), (-30.2593476001, -28.0793341726), (-39.9485270765, -27.084138978), (-41.5731213994, -19.0839214737), (-42.7368953456, -14.7625750948)],
                knots=[0.0091079643, 0.0091079643, 0.0091079643, 0.0091079643, 0.354508674, 0.649032011, 1, 1, 1, 1], degree=3))
            Line((-42.7368953456, -14.7625750948), (-41.5731213994, -31.5352441965))
            Line((-41.5731213994, -31.5352441965), (-18.9627626107, -31.5352441965))
        make_face()
        with BuildLine():
            Line((43.0552338276, -47.5783012807), (18.9627626107, -44.6413718164))
            Line((18.9627626107, -44.6413718164), (18.9627626107, -47.625))
            add(Edge.make_bspline(
                [(18.9627626107, -47.625), (23.0954598814, -47.7786602348), (30.4886262273, -48.0846009077), (40.2668655585, -49.0889436199), (41.8914598814, -57.0891611241), (43.0552338276, -61.4105075031)],
                knots=[0, 0, 0, 0, 0.354508674, 0.649032011, 1, 1, 1, 1], degree=3))
            Line((43.0552338276, -61.4105075031), (43.0552338276, -47.5783012807))
        make_face()
        with BuildLine():
            Line((-18.9627626107, -47.625), (-18.9627626107, -47.6131283575))
            add(Edge.make_bspline(
                [(-18.9627626107, -47.6131283575), (-22.984413459, -47.4626849717), (-30.259346278, -47.156251522), (-38.7733625028, -46.2817597185), (-40.8056843428, -40.8850393206), (-41.5731195634, -38.2003750823)],
                knots=[0.0091080169, 0.0091080169, 0.0091080169, 0.0091080169, 0.354508674, 0.649032011, 0.8798185749, 0.8798185749, 0.8798185749, 0.8798185749], degree=3))
            Line((-41.5731195634, -38.2003750823), (-41.5731195634, -49.7814901173))
            Line((-41.5731195634, -49.7814901173), (-18.6444222927, -51.0930578942))
            ThreePointArc((-18.6444222927, -51.0930578942), (-18.883010592, -49.366318905), (-18.9627626107, -47.625))
        make_face()
        with BuildLine():
            Line((31.425178051, -77.8287127614), (14.5586451488, -59.8069795058))
            ThreePointArc((14.5586451488, -59.8069795058), (13.7941569026, -60.6714321756), (12.9787289686, -61.4880091659))
            add(Edge.make_bspline(
                [(12.9787289686, -61.4880091659), (15.7923330393, -64.5189216247), (20.8037583725, -69.9630124067), (27.0078401692, -77.5874492883), (22.4995937834, -84.3932189989), (20.2668529041, -88.2717847765)],
                knots=[0, 0, 0, 0, 0.354508674, 0.649032011, 1, 1, 1, 1], degree=3))
            Line((20.2668529041, -88.2717847765), (31.425178051, -77.8287127614))
        make_face()
        with BuildLine():
            ThreePointArc((-8.8973030522, -64.4232300572), (-11.1490506185, -63.0083784263), (-13.1818276234, -61.2937385552))
            add(Edge.make_bspline(
                [(-13.1818276234, -61.2937385552), (-16.2127400821, -64.1073426259), (-21.6568308642, -69.118767959), (-29.2812677458, -75.3228497557), (-36.0870374564, -70.81460337), (-39.9656032339, -68.5818624906)],
                knots=[0, 0, 0, 0, 0.354508674, 0.649032011, 1, 1, 1, 1], degree=3))
            Line((-39.9656032339, -68.5818624906), (-22.0917928964, -81.9996222854))
            Line((-22.0917928964, -81.9996222854), (-8.8973030522, -64.4232300572))
        make_face()
        with BuildLine():
            Line((5.4554608651, -90.7667335021), (5.4554608651, -65.8508332062))
            ThreePointArc((5.4554608651, -65.8508332062), (2.7974683178, -66.4553205757), (0.0804122108, -66.6742622852))
            add(Edge.make_bspline(
                [(0.0804122108, -66.6742622852), (0.0804030753, -66.6745079851), (0.0803939398, -66.6747536846), (0.0803848041, -66.6749993838)],
                knots=[0, 0, 0, 0, 2.10765e-05, 2.10765e-05, 2.10765e-05, 2.10765e-05], degree=3))
            add(Edge.make_bspline(
                [(0.0803848041, -66.6749993838), (-0.0732678944, -70.8074397221), (-0.3792098648, -78.2003319927), (-1.3835314091, -87.978365233), (-9.3837489133, -89.602959556), (-13.7050952923, -90.7667335021)],
                knots=[2.10765e-05, 2.10765e-05, 2.10765e-05, 2.10765e-05, 0.354508674, 0.649032011, 1, 1, 1, 1], degree=3))
            Line((-13.7050952923, -90.7667335021), (5.4554608651, -90.7667335021))
        make_face()
        with BuildLine():
            add(Edge.make_bspline(
                [(0.0804122108, -66.6742622852), (0.0804030753, -66.6745079851), (0.0803939398, -66.6747536846), (0.0803848041, -66.6749993838)],
                knots=[0, 0, 0, 0, 2.10765e-05, 2.10765e-05, 2.10765e-05, 2.10765e-05], degree=3))
            ThreePointArc((0.0804122108, -66.6742622852), (0.0402063893, -66.6745736982), (0, -66.6748002519))
            ThreePointArc((0, -66.6748002519), (0.0401922975, -66.6749419096), (0.0803848041, -66.6749993838))
        make_face()
        with BuildLine():
            ThreePointArc((0.0803848044, -66.6749987675), (0.0401922975, -66.6749419096), (0, -66.6748002519))
            ThreePointArc((0, -66.6748002519), (-0.0436185803, -66.6749500629), (-0.0872373893, -66.675))
            Line((-0.0872373893, -66.675), (0.0803848044, -66.6749987675))
        make_face()
    extrude(amount=F1_DEPTH)


solid = f1.part
